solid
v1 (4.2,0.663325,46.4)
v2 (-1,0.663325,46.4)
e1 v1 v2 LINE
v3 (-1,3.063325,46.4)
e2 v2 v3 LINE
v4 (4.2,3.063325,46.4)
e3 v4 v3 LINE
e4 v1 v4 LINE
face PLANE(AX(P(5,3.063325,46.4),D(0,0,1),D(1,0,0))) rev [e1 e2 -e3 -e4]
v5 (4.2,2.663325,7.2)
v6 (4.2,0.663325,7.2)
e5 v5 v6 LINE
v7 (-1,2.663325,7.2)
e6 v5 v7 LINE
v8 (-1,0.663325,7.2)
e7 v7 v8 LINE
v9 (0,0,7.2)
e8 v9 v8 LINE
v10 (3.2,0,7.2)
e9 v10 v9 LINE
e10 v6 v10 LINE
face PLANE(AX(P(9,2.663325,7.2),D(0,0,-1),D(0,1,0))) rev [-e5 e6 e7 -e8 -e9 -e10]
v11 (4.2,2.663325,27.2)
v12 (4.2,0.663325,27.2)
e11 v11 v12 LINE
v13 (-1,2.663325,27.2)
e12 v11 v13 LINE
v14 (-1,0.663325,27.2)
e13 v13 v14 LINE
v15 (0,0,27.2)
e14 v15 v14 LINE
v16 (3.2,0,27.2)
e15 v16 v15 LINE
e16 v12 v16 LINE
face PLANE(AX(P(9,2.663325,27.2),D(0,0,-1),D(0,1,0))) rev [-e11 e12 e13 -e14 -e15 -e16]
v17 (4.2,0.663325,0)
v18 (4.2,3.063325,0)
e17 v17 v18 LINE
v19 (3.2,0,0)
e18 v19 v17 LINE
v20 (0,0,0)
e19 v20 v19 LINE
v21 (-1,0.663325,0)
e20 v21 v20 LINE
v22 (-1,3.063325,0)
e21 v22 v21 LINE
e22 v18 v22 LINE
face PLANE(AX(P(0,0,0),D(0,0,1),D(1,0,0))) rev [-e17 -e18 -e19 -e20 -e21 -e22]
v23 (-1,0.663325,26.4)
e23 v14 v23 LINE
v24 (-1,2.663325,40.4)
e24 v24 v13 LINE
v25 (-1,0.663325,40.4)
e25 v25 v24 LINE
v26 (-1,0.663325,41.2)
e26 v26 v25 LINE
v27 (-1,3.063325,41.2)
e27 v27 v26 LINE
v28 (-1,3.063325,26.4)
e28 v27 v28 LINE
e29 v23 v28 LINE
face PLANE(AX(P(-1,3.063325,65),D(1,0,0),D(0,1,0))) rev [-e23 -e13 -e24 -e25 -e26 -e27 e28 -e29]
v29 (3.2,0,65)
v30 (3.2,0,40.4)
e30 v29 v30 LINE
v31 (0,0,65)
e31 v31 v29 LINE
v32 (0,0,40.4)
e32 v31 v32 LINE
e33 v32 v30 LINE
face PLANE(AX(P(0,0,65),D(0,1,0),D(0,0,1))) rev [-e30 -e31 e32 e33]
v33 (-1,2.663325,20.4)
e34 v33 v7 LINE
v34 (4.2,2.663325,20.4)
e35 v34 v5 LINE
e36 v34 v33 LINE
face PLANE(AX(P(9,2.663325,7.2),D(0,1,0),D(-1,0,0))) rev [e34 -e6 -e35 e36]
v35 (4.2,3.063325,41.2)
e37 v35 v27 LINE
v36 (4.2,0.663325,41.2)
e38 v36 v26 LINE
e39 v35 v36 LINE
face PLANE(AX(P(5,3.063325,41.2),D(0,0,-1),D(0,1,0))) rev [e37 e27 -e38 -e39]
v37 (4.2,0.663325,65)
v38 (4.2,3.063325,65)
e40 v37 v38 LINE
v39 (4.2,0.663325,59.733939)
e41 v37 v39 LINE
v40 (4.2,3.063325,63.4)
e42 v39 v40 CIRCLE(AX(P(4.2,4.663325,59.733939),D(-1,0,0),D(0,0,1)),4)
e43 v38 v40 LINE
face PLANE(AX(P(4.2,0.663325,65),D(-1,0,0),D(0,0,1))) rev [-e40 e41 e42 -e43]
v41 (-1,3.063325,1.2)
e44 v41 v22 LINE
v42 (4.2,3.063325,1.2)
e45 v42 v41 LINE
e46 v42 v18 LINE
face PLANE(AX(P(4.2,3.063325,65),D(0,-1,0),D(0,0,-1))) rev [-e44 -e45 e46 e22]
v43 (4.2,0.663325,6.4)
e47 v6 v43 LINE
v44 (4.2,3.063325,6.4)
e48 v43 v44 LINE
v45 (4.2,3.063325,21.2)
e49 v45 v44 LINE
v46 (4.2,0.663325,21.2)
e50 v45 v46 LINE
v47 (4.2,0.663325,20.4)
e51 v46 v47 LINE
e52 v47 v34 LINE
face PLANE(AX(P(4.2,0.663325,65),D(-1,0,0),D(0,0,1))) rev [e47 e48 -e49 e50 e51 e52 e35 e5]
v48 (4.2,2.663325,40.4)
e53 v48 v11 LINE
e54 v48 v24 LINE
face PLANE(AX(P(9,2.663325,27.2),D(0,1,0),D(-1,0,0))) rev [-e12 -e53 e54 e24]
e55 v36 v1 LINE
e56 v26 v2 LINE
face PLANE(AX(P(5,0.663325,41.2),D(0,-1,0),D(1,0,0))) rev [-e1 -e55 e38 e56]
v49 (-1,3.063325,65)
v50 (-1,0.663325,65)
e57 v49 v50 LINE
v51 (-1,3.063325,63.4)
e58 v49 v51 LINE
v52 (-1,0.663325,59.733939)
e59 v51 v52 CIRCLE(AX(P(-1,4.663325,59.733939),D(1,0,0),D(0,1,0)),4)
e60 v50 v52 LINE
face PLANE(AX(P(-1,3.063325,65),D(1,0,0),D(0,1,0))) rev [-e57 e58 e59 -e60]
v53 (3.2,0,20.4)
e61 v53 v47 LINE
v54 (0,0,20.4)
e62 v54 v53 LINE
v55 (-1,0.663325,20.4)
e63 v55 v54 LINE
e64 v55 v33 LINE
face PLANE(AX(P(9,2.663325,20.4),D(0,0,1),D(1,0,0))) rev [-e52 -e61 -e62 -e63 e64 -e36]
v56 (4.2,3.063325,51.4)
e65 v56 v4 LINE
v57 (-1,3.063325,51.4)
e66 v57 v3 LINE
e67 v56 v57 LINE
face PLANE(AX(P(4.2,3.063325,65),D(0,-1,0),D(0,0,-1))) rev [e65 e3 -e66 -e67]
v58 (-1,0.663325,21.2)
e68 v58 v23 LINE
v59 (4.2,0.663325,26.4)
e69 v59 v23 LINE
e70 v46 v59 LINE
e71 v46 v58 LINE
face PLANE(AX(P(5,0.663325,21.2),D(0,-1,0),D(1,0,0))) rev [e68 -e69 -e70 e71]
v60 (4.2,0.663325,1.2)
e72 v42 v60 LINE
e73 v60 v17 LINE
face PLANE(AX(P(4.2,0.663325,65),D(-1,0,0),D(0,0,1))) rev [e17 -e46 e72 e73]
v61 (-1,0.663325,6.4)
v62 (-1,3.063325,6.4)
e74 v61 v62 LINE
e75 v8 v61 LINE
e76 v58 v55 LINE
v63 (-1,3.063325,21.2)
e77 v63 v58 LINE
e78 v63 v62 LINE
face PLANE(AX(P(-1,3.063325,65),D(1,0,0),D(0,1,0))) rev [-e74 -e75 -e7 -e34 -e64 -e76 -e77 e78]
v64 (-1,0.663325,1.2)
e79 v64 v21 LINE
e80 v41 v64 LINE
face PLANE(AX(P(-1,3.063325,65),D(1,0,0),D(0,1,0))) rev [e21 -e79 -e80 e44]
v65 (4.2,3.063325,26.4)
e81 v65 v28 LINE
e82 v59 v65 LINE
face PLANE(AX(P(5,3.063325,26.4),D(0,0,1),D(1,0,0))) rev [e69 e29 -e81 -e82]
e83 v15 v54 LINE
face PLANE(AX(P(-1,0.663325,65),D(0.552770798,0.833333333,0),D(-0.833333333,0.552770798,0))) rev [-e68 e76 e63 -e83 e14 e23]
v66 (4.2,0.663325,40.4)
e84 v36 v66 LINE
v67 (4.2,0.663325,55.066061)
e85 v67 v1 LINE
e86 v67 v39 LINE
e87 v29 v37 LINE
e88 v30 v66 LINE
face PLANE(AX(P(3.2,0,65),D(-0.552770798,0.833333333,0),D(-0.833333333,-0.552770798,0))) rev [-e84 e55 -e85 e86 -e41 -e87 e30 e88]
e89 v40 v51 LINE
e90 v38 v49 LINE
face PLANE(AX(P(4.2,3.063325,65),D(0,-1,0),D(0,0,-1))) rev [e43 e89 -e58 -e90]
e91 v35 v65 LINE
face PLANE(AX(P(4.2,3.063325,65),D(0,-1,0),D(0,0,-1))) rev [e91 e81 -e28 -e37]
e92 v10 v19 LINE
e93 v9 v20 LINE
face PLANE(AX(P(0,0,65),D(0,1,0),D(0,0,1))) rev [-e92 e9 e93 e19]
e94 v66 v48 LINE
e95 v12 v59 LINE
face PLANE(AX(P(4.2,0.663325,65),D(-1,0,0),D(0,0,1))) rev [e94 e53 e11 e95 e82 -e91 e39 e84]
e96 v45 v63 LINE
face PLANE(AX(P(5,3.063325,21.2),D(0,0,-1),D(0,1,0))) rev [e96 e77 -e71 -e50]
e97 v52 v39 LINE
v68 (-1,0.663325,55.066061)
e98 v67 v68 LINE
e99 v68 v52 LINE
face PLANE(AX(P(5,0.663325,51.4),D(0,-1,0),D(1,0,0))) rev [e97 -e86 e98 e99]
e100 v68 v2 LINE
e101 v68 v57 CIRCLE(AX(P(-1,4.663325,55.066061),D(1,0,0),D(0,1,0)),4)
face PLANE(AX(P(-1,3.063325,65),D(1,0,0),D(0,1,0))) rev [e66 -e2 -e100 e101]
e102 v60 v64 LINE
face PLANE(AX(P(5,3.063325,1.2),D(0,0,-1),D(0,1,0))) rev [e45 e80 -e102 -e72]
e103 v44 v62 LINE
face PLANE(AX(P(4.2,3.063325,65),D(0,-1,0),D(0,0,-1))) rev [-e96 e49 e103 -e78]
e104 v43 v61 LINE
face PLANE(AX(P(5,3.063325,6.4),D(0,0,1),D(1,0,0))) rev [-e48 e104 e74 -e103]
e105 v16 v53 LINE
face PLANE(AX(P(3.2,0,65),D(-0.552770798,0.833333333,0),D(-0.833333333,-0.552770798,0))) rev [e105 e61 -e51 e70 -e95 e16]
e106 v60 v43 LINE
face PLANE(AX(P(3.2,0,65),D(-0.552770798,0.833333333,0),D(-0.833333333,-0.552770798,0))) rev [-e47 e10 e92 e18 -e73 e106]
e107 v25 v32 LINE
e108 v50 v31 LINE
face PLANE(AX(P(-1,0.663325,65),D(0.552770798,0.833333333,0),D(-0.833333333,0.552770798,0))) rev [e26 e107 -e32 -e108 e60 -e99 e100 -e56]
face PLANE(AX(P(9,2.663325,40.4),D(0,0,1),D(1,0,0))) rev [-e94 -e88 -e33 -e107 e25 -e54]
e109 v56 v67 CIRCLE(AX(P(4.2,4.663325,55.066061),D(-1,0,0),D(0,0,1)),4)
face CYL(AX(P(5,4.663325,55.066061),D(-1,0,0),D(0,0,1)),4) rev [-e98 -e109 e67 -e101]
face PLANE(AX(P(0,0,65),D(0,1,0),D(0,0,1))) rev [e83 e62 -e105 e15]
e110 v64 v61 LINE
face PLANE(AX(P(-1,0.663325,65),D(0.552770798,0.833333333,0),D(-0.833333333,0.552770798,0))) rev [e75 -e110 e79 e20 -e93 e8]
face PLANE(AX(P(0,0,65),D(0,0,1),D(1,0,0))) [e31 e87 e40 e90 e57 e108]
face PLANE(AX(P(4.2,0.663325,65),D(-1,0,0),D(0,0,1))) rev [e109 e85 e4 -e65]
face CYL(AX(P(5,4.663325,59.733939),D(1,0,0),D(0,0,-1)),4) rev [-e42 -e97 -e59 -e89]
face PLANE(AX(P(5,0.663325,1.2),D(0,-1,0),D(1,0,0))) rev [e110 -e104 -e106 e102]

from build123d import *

# Parameters (mm, degrees)
BOSS_EXTRUDE1_DEPTH = 65
SKETCH2_W           = 5.2
SKETCH2_H           = 2.4
CUT_EXTRUDE1_DEPTH  = 6
LPATTERN1_COUNT     = 3
LPATTERN1_PITCH     = 20
SKETCH3_W           = 12
SKETCH3_H           = 2.4
CUT_EXTRUDE2_DEPTH  = 6
FILLET1_R           = 4
FILLET2_R           = 4
SKETCH5_W           = 13.2
SKETCH5_H           = 3.1
CUT_EXTRUDE3_DEPTH  = 10
LPATTERN2_COUNT     = 2
LPATTERN2_PITCH     = 20


with BuildPart() as part:
    # Sketch1 → Boss-Extrude1 (new body)
    with BuildSketch(Plane.XY):
        Polygon((0, 0), (3.2, 0), (4.2, 0.663324958), (4.2, 3.063324958), (-1, 3.063324958), (-1, 0.663324958), align=None)
    extrude(amount=BOSS_EXTRUDE1_DEPTH)

    # Sketch2 → Cut-Extrude1 (cut)
    with BuildSketch(Plane.ZY.offset(1)):
        with Locations((3.8, 1.863324958)):
            Rectangle(SKETCH2_W, SKETCH2_H)
    cut_extrude1 = extrude(amount=-CUT_EXTRUDE1_DEPTH, mode=Mode.SUBTRACT)

    # LPattern1: Cut-Extrude1 ×3
    with Locations(*[(0, 0, i * LPATTERN1_PITCH) for i in range(1, LPATTERN1_COUNT)]):
        add(cut_extrude1, mode=Mode.SUBTRACT)

    # Sketch3 → Cut-Extrude2 (cut)
    with BuildSketch(Plane.ZY.offset(1)):
        with Locations((57.4, 1.863324958)):
            Rectangle(SKETCH3_W, SKETCH3_H)
    extrude(amount=-CUT_EXTRUDE2_DEPTH, mode=Mode.SUBTRACT)

    # Fillet1
    # the kernel refuses this fillet: 4 mm, written as the material it adds along each edge
    with BuildSketch(Plane(origin=(-1, 0.663324958, 51.4), x_dir=(0, 0, 1), z_dir=(1, 0, 0))) as fillet1_piece_1_section:
        with BuildLine():
            CenterArc((3.666060556, -4), FILLET1_R, 90, 66.421821522)
            Line((0, -2.4), (-0.073321211, -2.368))
            ThreePointArc((-0.073321211, -2.368), (-0.08, -1.2), (-0.08, 0))
            Line((-0.08, 0), (0, 0.08))
            Line((0, 0.08), (3.666060556, 0.08))
            Line((3.666060556, 0.08), (3.666060556, 0))
        make_face()
    fillet1_piece_1 = extrude(amount=5.2, mode=Mode.PRIVATE)
    fillet1_piece_1 = split(fillet1_piece_1, bisect_by=Plane(origin=(0.518931728, -0.344220367, 52.290586237), z_dir=(0.5527707983925672, 0.833333333333333, 0)), keep=Keep.TOP, mode=Mode.PRIVATE)
    fillet1_piece_1 = split(fillet1_piece_1, bisect_by=Plane(origin=(2.681068272, -0.344220367, 52.290586237), z_dir=(-0.5527707983925666, 0.8333333333333335, 0)), keep=Keep.TOP, mode=Mode.PRIVATE)
    add(fillet1_piece_1)

    # Fillet2
    # the kernel refuses this fillet: 4 mm, written as the material it adds along each edge
    with BuildSketch(Plane(origin=(-1, 0.663324958, 63.4), x_dir=(0, 1, 0), z_dir=(1, 0, 0))) as fillet2_piece_1_section:
        with BuildLine():
            CenterArc((4, -3.666060556), FILLET2_R, 113.578178478, 66.421821522)
            Line((0, -3.666060556), (-0.08, -3.666060556))
            Line((-0.08, -3.666060556), (-0.08, 0))
            Line((-0.08, 0), (0, 0.08))
            ThreePointArc((0, 0.08), (1.2, 0.08), (2.368, 0.073321211))
            Line((2.368, 0.073321211), (2.4, 0))
        make_face()
    fillet2_piece_1 = extrude(amount=5.2, mode=Mode.PRIVATE)
    fillet2_piece_1 = split(fillet2_piece_1, bisect_by=Plane(origin=(2.681068272, -0.344220367, 62.509413763), z_dir=(-0.5527707983925666, 0.8333333333333335, 0)), keep=Keep.TOP, mode=Mode.PRIVATE)
    fillet2_piece_1 = split(fillet2_piece_1, bisect_by=Plane(origin=(0.518931728, -0.344220367, 62.509413763), z_dir=(0.5527707983925672, 0.833333333333333, 0)), keep=Keep.TOP, mode=Mode.PRIVATE)
    add(fillet2_piece_1)

    # Sketch5 → Cut-Extrude3 (cut)
    with BuildSketch(Plane.ZY.offset(1)):
        with Locations((13.8, 1.113324958)):
            Rectangle(SKETCH5_W, SKETCH5_H)
    cut_extrude3 = extrude(amount=-CUT_EXTRUDE3_DEPTH, mode=Mode.SUBTRACT)

    # LPattern2: Cut-Extrude3 ×2
    with Locations(*[(0, 0, i * LPATTERN2_PITCH) for i in range(1, LPATTERN2_COUNT)]):
        add(cut_extrude3, mode=Mode.SUBTRACT)


solid = part.part
